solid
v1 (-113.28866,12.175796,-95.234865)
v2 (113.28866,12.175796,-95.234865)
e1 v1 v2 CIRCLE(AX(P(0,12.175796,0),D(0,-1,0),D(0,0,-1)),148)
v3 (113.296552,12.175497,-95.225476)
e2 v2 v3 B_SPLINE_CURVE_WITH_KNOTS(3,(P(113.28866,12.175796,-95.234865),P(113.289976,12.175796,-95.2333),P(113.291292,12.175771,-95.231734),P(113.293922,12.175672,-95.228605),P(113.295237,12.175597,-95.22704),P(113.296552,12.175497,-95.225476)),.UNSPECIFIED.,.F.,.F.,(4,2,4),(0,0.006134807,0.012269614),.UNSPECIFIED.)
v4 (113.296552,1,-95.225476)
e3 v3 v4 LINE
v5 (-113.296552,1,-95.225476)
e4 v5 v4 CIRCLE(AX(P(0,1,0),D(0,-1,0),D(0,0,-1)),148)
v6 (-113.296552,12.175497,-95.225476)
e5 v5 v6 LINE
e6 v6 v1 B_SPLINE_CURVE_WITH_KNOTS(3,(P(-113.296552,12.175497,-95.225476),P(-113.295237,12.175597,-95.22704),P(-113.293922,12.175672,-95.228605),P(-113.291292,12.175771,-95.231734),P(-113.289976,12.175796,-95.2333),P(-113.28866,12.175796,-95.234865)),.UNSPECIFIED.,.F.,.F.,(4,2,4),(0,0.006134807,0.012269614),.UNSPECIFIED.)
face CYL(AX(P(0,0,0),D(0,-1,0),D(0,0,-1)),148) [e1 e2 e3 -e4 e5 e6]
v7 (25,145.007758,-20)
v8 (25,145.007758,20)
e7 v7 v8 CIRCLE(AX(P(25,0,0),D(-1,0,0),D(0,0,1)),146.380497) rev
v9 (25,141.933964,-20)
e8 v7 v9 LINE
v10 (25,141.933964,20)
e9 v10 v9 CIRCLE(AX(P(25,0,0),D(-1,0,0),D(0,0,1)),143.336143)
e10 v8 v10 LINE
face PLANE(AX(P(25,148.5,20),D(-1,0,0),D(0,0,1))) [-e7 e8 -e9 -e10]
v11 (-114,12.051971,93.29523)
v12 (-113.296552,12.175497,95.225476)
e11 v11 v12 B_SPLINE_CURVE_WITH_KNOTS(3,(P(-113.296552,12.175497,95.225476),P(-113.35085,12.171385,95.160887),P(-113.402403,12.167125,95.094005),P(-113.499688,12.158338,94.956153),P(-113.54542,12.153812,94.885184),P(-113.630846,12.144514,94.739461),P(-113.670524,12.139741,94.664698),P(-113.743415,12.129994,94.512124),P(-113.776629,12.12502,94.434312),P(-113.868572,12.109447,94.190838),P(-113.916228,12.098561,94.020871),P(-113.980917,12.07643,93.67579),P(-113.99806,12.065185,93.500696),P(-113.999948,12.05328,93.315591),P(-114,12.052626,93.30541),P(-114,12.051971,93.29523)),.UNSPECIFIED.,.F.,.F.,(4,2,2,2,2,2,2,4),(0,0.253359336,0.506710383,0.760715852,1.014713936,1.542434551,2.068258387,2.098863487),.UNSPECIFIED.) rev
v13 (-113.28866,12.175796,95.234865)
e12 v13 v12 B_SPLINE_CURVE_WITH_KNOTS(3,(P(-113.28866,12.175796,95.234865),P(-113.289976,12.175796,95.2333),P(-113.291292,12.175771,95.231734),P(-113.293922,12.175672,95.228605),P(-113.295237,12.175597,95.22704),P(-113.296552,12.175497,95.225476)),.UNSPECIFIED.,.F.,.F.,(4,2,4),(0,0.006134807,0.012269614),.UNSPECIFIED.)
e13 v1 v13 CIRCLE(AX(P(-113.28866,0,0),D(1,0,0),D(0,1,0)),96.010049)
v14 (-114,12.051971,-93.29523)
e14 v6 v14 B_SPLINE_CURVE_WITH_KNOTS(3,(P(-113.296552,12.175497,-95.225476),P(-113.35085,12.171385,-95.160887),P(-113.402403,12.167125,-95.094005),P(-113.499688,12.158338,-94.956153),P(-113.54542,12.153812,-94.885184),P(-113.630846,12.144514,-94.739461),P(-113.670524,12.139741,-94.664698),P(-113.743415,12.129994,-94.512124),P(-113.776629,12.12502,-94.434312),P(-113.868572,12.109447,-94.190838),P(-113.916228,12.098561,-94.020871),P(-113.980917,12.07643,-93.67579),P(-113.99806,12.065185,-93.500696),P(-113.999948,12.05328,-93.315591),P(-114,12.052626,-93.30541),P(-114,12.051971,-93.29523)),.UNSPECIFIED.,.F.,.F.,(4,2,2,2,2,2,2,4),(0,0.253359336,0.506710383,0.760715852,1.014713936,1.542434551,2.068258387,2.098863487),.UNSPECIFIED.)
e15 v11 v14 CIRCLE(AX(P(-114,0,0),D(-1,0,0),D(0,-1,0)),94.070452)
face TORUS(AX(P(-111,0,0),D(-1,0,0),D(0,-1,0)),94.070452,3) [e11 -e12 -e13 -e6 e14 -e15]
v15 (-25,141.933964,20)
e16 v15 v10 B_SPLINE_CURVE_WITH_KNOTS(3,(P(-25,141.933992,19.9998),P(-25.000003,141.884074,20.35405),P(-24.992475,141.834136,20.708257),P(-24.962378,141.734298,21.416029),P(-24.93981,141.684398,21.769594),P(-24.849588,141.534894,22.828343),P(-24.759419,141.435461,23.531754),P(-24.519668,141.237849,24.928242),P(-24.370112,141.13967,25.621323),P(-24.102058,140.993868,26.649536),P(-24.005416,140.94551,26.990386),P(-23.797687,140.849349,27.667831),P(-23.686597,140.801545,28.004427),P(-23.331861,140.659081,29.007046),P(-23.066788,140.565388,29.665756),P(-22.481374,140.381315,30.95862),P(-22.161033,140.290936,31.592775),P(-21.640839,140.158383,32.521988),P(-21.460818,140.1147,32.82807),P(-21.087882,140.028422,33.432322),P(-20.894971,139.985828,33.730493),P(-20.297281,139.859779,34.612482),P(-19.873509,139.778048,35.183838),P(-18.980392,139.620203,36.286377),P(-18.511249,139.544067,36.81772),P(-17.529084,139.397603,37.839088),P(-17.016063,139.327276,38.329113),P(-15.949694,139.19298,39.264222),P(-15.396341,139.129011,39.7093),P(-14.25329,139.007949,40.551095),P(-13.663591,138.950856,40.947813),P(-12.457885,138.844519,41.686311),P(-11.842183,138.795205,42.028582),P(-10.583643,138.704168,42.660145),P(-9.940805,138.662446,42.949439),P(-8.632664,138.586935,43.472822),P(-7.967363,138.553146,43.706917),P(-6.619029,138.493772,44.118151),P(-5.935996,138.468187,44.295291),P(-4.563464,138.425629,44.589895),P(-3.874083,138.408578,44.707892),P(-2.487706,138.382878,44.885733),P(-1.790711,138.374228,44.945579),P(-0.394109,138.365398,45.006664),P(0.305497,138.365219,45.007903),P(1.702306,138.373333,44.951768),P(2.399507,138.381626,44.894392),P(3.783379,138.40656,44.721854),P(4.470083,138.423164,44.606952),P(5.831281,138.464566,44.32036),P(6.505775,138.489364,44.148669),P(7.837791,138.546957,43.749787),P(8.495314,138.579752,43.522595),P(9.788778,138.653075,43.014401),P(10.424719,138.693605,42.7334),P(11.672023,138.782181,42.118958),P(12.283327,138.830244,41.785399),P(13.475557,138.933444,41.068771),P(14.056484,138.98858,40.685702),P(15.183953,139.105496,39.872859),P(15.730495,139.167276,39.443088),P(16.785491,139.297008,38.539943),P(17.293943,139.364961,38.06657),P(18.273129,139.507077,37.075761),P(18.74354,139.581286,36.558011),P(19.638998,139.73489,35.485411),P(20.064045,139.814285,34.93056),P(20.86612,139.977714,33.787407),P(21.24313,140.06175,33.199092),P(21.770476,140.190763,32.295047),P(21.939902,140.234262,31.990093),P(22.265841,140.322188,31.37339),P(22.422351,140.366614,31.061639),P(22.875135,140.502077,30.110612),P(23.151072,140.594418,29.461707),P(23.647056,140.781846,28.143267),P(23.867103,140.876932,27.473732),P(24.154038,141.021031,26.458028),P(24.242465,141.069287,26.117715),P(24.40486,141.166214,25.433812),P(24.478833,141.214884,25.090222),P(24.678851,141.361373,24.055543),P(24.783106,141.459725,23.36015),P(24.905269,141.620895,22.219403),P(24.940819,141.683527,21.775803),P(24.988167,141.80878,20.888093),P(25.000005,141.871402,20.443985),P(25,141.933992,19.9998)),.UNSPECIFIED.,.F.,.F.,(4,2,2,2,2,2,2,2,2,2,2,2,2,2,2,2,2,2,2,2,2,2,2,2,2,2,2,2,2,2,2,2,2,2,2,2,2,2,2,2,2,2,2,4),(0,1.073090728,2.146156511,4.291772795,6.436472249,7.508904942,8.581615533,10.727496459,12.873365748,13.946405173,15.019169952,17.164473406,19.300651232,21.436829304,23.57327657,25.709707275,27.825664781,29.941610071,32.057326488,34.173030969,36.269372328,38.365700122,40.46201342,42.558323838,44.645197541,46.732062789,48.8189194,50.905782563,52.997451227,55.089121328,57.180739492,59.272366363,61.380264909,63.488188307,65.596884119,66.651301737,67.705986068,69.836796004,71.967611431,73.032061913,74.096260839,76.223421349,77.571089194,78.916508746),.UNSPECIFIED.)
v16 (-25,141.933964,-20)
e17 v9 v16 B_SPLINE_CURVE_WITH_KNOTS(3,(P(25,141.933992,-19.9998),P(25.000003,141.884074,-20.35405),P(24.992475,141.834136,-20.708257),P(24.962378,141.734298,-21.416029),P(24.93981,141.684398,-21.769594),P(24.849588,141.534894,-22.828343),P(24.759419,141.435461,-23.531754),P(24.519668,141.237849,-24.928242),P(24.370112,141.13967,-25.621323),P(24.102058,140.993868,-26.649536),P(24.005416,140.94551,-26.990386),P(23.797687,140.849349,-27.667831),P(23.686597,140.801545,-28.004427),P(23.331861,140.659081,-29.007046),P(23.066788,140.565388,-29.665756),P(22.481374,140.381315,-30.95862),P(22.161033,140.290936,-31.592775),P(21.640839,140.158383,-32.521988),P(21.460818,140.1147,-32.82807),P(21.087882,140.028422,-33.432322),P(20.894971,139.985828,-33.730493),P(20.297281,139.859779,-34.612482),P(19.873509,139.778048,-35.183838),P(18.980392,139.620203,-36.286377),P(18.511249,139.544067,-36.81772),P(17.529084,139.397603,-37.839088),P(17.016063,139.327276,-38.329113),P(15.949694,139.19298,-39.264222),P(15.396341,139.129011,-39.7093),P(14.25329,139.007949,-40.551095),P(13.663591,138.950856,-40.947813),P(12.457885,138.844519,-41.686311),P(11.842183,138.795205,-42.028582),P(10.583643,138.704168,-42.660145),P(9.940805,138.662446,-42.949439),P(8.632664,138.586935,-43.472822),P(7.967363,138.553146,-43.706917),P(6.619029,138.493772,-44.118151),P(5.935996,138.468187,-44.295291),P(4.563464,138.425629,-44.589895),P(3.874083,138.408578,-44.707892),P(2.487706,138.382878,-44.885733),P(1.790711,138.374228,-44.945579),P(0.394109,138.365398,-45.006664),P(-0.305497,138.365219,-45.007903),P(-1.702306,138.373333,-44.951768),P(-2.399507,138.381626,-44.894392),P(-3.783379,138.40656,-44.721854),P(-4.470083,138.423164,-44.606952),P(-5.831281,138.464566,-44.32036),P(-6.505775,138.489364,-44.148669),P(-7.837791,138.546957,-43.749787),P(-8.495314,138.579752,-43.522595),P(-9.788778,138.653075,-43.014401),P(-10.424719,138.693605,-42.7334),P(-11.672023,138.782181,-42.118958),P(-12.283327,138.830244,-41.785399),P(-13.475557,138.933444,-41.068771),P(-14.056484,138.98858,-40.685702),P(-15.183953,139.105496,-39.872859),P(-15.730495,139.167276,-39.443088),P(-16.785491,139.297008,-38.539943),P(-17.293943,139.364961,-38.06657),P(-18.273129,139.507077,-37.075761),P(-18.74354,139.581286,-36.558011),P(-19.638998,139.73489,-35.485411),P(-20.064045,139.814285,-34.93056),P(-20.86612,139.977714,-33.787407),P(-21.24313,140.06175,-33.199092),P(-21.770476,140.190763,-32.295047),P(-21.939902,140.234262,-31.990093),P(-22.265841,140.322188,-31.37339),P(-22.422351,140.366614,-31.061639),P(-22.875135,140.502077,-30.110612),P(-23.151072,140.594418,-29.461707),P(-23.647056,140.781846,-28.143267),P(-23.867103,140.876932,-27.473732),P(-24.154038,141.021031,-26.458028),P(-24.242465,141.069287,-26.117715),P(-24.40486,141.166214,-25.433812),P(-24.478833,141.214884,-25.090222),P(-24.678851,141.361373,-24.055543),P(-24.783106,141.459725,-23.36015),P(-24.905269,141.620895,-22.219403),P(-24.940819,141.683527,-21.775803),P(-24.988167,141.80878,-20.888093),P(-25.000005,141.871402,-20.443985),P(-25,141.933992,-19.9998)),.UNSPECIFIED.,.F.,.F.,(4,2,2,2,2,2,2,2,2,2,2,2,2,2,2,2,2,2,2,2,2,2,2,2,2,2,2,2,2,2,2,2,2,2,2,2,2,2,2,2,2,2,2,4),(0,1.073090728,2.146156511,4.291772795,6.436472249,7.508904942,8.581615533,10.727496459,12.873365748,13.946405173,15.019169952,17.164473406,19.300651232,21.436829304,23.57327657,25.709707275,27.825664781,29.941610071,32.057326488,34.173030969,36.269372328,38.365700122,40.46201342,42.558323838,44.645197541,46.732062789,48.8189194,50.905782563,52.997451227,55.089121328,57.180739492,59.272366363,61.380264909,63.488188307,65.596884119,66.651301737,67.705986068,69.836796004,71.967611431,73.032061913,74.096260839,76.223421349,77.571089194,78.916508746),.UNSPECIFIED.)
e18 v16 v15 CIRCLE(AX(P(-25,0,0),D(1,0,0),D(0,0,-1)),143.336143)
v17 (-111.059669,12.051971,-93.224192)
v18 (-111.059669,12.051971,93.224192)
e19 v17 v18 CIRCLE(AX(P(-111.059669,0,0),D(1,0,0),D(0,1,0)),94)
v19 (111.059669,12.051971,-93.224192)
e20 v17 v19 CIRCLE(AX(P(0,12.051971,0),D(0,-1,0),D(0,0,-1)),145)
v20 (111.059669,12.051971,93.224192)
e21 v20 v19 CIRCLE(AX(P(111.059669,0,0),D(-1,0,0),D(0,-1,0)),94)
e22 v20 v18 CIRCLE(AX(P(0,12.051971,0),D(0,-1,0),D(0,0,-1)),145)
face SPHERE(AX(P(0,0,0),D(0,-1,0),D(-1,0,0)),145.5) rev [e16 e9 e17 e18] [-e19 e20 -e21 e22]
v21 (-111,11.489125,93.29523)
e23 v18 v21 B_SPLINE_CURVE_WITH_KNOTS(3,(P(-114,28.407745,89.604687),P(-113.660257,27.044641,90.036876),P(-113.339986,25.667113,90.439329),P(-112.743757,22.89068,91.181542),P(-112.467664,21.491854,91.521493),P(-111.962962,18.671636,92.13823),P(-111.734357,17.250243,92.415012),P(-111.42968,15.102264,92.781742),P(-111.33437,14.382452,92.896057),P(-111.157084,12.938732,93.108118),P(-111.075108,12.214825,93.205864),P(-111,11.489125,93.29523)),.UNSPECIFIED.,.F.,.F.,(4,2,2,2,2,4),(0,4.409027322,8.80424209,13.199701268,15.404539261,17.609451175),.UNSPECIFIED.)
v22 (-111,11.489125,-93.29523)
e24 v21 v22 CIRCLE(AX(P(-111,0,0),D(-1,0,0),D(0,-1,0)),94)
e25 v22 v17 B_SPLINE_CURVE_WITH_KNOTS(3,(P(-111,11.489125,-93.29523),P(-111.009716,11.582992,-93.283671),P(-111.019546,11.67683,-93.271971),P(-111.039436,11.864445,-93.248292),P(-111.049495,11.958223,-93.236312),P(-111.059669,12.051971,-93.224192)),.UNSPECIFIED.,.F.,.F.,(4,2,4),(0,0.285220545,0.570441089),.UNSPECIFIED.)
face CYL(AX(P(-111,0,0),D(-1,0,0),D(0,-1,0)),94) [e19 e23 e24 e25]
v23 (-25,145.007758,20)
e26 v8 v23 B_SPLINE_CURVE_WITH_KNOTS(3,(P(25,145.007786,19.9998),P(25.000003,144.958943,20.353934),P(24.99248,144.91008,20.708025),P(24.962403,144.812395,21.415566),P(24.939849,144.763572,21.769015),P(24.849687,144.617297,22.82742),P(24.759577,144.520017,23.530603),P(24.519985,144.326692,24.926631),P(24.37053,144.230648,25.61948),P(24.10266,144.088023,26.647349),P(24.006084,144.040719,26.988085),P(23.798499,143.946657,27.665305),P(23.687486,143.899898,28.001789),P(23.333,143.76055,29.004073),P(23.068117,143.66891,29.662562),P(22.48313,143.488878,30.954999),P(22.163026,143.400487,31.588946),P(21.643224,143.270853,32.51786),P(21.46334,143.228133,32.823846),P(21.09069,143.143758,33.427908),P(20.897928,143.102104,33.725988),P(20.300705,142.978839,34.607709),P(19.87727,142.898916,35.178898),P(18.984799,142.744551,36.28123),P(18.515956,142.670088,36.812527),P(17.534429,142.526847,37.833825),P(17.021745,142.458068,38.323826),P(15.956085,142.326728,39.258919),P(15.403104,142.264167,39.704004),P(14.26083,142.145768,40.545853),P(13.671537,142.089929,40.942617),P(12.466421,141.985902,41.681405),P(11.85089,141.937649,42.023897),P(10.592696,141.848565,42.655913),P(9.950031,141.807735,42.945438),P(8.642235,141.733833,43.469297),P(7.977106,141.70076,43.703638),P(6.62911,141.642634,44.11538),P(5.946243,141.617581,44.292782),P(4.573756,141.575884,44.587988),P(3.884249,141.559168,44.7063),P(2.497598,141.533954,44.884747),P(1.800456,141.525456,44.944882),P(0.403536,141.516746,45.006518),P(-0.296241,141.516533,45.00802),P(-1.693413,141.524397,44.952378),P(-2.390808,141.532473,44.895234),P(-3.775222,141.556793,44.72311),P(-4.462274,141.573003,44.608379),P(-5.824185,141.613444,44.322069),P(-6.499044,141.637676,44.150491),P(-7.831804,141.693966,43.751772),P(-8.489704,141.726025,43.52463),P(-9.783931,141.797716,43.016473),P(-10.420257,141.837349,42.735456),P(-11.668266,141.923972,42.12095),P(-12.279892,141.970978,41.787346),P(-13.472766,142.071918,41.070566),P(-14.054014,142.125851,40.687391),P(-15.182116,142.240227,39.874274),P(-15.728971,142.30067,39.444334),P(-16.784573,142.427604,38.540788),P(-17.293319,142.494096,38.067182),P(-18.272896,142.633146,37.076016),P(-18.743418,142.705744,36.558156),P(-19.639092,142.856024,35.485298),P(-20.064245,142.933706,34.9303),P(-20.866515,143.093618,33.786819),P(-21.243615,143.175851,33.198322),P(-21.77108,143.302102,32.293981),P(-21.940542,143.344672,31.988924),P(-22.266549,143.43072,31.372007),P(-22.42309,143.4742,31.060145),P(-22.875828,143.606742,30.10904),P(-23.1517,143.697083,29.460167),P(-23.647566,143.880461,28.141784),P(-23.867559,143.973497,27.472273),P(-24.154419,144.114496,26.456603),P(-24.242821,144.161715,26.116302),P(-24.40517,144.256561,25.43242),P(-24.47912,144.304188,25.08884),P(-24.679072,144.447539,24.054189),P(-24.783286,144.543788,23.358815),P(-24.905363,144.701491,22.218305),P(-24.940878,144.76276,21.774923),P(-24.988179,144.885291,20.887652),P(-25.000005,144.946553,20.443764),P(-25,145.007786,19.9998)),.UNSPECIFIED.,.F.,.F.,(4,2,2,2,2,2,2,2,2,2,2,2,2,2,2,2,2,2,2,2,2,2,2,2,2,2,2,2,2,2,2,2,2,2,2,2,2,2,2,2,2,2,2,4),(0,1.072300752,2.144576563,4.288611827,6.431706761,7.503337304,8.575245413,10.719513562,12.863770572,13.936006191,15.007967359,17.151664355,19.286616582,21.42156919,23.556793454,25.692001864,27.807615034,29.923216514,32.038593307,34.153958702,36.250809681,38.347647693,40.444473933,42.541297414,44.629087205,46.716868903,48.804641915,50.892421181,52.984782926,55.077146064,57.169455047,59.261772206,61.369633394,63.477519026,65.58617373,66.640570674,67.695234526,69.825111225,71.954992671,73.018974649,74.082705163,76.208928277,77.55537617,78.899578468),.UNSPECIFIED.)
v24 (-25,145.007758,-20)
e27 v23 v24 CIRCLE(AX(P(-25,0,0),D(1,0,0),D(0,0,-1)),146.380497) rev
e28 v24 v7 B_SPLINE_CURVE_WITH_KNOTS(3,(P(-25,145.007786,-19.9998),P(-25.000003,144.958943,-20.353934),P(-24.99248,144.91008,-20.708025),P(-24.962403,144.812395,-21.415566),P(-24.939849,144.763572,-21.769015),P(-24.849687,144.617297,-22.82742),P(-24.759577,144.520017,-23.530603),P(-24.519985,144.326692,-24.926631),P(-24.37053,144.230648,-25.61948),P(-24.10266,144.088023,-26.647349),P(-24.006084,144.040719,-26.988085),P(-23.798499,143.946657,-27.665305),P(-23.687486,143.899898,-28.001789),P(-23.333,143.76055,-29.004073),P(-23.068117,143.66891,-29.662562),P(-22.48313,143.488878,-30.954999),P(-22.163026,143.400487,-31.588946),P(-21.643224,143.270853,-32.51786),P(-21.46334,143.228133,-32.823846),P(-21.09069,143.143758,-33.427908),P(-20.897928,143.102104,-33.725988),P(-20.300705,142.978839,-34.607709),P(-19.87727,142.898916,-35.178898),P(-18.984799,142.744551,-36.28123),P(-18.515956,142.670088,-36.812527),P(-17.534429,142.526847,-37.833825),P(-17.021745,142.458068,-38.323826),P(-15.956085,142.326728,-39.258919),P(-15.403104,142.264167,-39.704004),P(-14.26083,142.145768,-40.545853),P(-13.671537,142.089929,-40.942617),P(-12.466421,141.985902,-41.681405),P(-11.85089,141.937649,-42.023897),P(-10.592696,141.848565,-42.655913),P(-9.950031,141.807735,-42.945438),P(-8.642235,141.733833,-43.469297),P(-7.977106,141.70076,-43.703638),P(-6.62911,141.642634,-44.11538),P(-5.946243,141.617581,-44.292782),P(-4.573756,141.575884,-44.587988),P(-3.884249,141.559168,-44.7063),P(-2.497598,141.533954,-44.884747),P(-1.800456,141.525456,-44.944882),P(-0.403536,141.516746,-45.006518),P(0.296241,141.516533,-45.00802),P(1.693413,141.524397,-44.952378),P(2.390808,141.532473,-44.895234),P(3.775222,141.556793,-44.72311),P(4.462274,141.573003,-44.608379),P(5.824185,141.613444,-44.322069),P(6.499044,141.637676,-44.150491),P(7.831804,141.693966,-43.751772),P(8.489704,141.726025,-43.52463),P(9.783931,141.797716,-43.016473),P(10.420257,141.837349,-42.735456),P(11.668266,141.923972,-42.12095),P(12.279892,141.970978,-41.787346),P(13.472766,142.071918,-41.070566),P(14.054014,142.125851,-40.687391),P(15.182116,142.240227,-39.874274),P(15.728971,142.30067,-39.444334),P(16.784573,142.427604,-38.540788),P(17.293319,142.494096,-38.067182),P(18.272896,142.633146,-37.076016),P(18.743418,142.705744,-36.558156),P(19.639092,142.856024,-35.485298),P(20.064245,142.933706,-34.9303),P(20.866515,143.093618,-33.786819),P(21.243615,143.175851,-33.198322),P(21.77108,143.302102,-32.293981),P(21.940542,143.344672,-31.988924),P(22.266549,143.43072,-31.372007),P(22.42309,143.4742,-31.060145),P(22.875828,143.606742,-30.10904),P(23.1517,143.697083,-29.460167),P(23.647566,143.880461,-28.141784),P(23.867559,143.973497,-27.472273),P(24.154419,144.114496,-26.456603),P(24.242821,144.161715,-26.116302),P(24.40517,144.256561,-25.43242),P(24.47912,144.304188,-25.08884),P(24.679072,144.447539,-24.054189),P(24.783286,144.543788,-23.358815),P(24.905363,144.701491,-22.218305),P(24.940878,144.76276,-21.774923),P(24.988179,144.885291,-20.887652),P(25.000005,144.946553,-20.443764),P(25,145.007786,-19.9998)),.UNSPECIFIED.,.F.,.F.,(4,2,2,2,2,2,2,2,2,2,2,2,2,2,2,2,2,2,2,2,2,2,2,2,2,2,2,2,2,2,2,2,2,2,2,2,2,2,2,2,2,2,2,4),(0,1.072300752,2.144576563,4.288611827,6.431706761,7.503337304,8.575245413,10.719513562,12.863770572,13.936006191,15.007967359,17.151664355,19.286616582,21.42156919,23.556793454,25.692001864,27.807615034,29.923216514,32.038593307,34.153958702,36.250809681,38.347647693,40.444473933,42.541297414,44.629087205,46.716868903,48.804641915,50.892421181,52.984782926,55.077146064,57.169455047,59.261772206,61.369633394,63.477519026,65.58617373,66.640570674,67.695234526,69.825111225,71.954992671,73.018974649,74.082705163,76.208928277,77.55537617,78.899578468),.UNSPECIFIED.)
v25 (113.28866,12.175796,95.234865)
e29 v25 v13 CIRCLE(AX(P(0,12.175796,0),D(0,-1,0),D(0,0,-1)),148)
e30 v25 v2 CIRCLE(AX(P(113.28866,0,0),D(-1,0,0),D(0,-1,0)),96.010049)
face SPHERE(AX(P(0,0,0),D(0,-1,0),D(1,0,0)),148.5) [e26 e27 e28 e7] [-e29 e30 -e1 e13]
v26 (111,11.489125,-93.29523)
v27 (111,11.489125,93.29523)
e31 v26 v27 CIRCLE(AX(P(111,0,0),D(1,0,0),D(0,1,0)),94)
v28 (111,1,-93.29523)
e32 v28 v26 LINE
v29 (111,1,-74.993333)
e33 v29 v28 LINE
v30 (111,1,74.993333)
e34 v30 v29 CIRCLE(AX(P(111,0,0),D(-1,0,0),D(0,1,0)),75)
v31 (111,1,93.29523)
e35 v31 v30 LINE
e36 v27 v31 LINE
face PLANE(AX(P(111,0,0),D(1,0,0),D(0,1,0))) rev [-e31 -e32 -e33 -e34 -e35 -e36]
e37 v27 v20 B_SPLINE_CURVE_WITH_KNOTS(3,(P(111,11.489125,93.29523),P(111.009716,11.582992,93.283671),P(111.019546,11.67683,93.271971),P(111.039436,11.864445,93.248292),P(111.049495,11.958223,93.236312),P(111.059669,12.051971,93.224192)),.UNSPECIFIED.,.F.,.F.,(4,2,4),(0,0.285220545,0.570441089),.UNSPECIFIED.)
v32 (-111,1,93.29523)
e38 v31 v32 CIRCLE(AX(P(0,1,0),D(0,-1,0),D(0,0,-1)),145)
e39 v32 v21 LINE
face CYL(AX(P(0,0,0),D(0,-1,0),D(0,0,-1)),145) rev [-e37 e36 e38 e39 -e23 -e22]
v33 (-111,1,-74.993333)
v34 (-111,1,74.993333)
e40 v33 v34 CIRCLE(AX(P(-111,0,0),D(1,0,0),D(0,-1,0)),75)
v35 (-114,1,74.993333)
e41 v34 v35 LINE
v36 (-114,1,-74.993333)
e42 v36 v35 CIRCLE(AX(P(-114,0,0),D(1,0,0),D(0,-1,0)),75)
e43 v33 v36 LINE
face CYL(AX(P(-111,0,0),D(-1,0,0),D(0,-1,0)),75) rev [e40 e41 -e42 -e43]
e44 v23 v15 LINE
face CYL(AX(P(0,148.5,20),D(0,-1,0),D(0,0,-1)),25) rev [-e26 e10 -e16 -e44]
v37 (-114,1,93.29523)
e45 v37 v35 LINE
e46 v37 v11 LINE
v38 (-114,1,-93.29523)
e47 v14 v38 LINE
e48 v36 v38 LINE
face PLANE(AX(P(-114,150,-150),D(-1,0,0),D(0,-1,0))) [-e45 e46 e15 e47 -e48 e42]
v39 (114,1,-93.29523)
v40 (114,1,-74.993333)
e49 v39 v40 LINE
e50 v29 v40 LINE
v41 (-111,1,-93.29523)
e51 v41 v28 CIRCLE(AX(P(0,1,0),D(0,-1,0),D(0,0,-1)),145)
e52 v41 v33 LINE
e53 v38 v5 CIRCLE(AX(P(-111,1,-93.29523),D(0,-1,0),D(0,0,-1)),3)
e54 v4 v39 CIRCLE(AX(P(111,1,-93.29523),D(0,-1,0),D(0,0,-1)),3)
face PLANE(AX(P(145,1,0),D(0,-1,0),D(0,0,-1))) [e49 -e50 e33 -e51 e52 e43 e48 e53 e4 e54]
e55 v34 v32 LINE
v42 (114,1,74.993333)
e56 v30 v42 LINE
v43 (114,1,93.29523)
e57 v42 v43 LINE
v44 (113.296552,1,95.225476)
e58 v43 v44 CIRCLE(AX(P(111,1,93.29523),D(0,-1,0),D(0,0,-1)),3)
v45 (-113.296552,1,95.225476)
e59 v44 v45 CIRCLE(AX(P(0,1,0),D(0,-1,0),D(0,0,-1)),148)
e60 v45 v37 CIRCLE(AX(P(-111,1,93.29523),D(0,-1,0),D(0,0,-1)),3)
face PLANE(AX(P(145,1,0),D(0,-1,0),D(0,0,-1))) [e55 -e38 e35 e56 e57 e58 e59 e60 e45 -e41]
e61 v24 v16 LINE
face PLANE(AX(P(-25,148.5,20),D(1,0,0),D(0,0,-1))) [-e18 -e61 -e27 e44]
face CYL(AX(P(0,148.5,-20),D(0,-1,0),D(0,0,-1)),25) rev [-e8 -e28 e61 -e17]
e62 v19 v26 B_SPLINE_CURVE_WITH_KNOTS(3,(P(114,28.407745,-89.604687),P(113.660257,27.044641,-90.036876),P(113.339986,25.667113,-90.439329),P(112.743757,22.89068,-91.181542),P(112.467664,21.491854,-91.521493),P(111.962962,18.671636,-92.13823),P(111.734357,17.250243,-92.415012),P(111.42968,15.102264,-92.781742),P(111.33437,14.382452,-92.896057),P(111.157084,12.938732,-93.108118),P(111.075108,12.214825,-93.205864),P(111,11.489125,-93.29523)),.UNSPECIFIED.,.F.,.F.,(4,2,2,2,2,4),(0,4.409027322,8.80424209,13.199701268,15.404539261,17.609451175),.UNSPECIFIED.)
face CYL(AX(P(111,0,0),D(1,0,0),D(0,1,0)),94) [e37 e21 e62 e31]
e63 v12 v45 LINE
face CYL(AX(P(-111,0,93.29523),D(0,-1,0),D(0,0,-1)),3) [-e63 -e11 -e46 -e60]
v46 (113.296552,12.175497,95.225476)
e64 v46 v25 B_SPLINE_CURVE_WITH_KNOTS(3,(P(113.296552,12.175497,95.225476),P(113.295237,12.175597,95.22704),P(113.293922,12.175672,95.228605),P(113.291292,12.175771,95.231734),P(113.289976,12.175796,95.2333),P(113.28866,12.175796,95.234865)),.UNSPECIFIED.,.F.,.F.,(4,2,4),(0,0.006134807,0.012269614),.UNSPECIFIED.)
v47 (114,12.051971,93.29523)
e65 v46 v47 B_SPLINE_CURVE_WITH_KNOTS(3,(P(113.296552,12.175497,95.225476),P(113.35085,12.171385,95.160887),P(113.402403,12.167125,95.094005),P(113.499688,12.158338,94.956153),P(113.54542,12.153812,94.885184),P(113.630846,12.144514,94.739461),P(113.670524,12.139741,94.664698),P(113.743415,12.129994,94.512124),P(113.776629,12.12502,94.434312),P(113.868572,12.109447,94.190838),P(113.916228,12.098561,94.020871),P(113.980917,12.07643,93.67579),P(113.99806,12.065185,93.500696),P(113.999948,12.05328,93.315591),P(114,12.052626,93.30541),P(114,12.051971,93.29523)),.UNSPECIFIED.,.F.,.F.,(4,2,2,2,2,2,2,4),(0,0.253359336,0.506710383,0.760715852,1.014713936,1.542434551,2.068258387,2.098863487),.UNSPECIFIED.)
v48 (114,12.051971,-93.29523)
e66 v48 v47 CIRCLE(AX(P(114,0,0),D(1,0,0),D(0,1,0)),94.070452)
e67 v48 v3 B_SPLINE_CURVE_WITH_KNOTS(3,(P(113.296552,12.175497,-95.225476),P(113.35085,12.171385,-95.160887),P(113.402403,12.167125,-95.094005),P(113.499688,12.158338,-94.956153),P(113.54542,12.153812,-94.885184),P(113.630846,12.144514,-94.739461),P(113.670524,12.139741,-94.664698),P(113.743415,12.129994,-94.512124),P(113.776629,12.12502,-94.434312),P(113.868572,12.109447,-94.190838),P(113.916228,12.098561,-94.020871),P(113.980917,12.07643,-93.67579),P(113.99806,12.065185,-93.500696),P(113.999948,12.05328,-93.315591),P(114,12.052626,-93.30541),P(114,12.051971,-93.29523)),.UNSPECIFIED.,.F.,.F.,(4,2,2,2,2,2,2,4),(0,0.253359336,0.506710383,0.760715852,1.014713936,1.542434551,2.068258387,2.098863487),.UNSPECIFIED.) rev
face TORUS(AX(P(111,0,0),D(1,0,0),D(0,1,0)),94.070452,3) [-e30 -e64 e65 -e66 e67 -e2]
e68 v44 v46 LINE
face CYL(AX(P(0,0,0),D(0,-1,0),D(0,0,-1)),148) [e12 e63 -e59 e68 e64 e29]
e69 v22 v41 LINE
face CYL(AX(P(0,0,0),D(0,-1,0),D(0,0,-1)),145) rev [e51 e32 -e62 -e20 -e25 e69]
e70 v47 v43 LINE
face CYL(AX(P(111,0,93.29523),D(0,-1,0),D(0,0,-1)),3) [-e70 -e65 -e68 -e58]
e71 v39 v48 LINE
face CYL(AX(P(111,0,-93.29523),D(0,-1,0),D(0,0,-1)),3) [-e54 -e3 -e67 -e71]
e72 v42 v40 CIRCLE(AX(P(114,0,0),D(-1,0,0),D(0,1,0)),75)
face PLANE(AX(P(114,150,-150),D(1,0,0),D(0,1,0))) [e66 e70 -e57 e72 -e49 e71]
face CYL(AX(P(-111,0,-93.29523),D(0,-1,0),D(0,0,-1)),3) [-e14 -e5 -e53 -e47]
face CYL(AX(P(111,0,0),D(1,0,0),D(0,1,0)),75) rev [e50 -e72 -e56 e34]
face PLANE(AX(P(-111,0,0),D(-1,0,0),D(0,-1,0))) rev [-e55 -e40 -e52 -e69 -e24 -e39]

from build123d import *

# Parameters (mm, degrees)
ESQUISSE2_OUTSIDE_W     = 386.766
ESQUISSE2_OUTSIDE_H     = 238.266
ESQUISSE2_OUTSIDE_W_2   = 228
ESQUISSE2_OUTSIDE_H_2   = 155
ENL_V_MAT_EXTRU_1_DEPTH = 150
ENL_V_MAT_EXTRU_2_DEPTH = 239.646705404
BOSS_EXTRU_1_DEPTH      = 3
BOSS_EXTRU_2_START      = -3
BOSS_EXTRU_2_DEPTH      = 3
CONG_9_R                = 3


with BuildPart() as part:
    # Esquisse1 → Révolution4 (revolve)
    with BuildSketch(Plane.XY, mode=Mode.PRIVATE) as r_volution4_sk:
        with BuildLine():
            Line((148, 12.175795662), (148, 1))
            Line((148, 1), (145, 1))
            Line((145, 1), (145, 12.051970793))
            ThreePointArc((145, 12.051970793), (98.530929788, 107.060290842), (0, 145.5))
            Line((0, 145.5), (0, 148.5))
            ThreePointArc((0, 148.5), (100.608509442, 109.225353412), (148, 12.175795662))
        make_face()
    revolve(r_volution4_sk.sketch.rotate(Axis((0, 0, 0), (0, 1, 0)), 90), axis=Axis((0, 0, 0), (0, 1, 0)))

    # Esquisse2 outside → Enlèv. mat.-Extru.1 (cut, symmetric)
    with BuildSketch(Plane.XY):
        with Locations((0, 74.75)):
            Rectangle(ESQUISSE2_OUTSIDE_W, ESQUISSE2_OUTSIDE_H)
        with Locations((0, 72.5)):
            Rectangle(ESQUISSE2_OUTSIDE_W_2, ESQUISSE2_OUTSIDE_H_2, mode=Mode.SUBTRACT)
    extrude(amount=ENL_V_MAT_EXTRU_1_DEPTH, both=True, mode=Mode.SUBTRACT)

    # Esquisse3 → Enlèv. mat.-Extru.2 (cut, through all)
    with BuildSketch(Plane(origin=(0, 0, 0), x_dir=(1, 0, 0), z_dir=(0, 1, 0))):
        with BuildLine():
            Line((-25, -20), (-25, 20))
            ThreePointArc((-25, 20), (0, 45), (25, 20))
            Line((25, 20), (25, -20))
            ThreePointArc((25, -20), (0, -45), (-25, -20))
        make_face()
    extrude(amount=ENL_V_MAT_EXTRU_2_DEPTH, mode=Mode.SUBTRACT)

    # Esquisse4 → Boss.-Extru.1 (add)
    with BuildSketch(Plane(origin=(114, 0, 0), x_dir=(0, 0, -1), z_dir=(1, 0, 0))):
        with BuildLine():
            Line((-93.994680701, 1), (-74.993333037, 1))
            ThreePointArc((-74.993333037, 1), (0, 75), (74.993333037, 1))
            Line((74.993333037, 1), (93.994680701, 1))
            ThreePointArc((93.994680701, 1), (0, 94), (-93.994680701, 1))
        make_face()
    extrude(amount=-BOSS_EXTRU_1_DEPTH)

    # Esquisse5 → Boss.-Extru.2 (add)
    with BuildSketch(Plane.ZY.offset(114).offset(BOSS_EXTRU_2_START)):
        with BuildLine():
            Line((-93.994680701, 1), (-74.993333037, 1))
            ThreePointArc((-74.993333037, 1), (0, 75), (74.993333037, 1))
            Line((74.993333037, 1), (93.994680701, 1))
            ThreePointArc((93.994680701, 1), (0, 94), (-93.994680701, 1))
        make_face()
    extrude(amount=BOSS_EXTRU_2_DEPTH)

    # Congé9
    # the kernel refuses this fillet: 3 mm, written as the material it takes off along each edge
    with BuildSketch(Plane(origin=(-114, 20.411983352, -94.382201712), x_dir=(0.6405708887604551, 0, -0.767899040546764), z_dir=(0, -1, 0)), Plane(origin=(114, 20.411983352, 94.382201712), x_dir=(-0.6405708887604538, 0, 0.7678990405467649), z_dir=(0, -1, 0))) as cong_9_piece_1:
        with BuildLine():
            CenterArc((1.087028375, 2.999979354), CONG_9_R, 230.165597581, 40.046969931)
            Line((-0.834684291, 0.696282232), (0, 0))
            ThreePointArc((0, 0), (0.549079179, -0.001018544), (1.098158359, 0))
        make_face()
    extrude(amount=22.157379249, mode=Mode.SUBTRACT)
    with BuildSketch(Plane(origin=(-114, 0, 0), x_dir=(0, 0.09906318090270165, -0.9950811455300712), z_dir=(0, -0.9950811455300712, -0.09906318090270165))) as cong_9_piece_2:
        with BuildLine():
            CenterArc((94.070452322, 3), CONG_9_R, 270, 40.28066089)
            ThreePointArc((96.010049277, 0.711340206), (95.587852119, 0.354883399), (95.164331553, 0))
            Line((95.164331553, 0), (94.070452322, 0))
        make_face()
    revolve(axis=Axis((-114, 0, 0), (1, 0, 0)), revolution_arc=168.629546335, mode=Mode.SUBTRACT)
    with BuildSketch(Plane(origin=(-114, 20.411983352, 94.382201712), x_dir=(0, 0, -1), z_dir=(0, -1, 0))) as cong_9_piece_3:
        with BuildLine():
            CenterArc((1.086971394, 3), CONG_9_R, 229.953030069, 40.046969931)
            ThreePointArc((-0.84327475, 0.703448276), (-0.422289825, 0.350941999), (0, 0))
            Line((0, 0), (1.086971394, 0))
        make_face()
    extrude(amount=22.157379249, mode=Mode.SUBTRACT)
    with BuildSketch(Plane(origin=(114, 0, 0), x_dir=(0, 0.09906318090270108, 0.9950811455300712), z_dir=(0, -0.9950811455300712, 0.09906318090270108))) as cong_9_piece_4:
        with BuildLine():
            CenterArc((94.070452322, 3), CONG_9_R, 270, 40.28066089)
            Line((94.070452322, 0), (95.164331553, 0))
            ThreePointArc((95.164331553, 0), (95.587852119, 0.354883399), (96.010049277, 0.711340206))
        make_face()
    revolve(axis=Axis((114, 0, 0), (-1, 0, 0)), revolution_arc=168.629546335, mode=Mode.SUBTRACT)
    with BuildSketch(Plane(origin=(114, 20.411983352, -94.382201712), x_dir=(-0.6405708887604424, 0, -0.7678990405467746), z_dir=(0, -1, 0))) as cong_9_piece_5:
        with BuildLine():
            CenterArc((1.087028375, -2.999979354), CONG_9_R, 89.787432488, 40.046969931)
            Line((-0.834684291, -0.696282232), (0, 0))
            ThreePointArc((0, 0), (0.549079179, 0.001018544), (1.098158359, 0))
        make_face()
    extrude(amount=22.157379249, mode=Mode.SUBTRACT)


solid = part.part
